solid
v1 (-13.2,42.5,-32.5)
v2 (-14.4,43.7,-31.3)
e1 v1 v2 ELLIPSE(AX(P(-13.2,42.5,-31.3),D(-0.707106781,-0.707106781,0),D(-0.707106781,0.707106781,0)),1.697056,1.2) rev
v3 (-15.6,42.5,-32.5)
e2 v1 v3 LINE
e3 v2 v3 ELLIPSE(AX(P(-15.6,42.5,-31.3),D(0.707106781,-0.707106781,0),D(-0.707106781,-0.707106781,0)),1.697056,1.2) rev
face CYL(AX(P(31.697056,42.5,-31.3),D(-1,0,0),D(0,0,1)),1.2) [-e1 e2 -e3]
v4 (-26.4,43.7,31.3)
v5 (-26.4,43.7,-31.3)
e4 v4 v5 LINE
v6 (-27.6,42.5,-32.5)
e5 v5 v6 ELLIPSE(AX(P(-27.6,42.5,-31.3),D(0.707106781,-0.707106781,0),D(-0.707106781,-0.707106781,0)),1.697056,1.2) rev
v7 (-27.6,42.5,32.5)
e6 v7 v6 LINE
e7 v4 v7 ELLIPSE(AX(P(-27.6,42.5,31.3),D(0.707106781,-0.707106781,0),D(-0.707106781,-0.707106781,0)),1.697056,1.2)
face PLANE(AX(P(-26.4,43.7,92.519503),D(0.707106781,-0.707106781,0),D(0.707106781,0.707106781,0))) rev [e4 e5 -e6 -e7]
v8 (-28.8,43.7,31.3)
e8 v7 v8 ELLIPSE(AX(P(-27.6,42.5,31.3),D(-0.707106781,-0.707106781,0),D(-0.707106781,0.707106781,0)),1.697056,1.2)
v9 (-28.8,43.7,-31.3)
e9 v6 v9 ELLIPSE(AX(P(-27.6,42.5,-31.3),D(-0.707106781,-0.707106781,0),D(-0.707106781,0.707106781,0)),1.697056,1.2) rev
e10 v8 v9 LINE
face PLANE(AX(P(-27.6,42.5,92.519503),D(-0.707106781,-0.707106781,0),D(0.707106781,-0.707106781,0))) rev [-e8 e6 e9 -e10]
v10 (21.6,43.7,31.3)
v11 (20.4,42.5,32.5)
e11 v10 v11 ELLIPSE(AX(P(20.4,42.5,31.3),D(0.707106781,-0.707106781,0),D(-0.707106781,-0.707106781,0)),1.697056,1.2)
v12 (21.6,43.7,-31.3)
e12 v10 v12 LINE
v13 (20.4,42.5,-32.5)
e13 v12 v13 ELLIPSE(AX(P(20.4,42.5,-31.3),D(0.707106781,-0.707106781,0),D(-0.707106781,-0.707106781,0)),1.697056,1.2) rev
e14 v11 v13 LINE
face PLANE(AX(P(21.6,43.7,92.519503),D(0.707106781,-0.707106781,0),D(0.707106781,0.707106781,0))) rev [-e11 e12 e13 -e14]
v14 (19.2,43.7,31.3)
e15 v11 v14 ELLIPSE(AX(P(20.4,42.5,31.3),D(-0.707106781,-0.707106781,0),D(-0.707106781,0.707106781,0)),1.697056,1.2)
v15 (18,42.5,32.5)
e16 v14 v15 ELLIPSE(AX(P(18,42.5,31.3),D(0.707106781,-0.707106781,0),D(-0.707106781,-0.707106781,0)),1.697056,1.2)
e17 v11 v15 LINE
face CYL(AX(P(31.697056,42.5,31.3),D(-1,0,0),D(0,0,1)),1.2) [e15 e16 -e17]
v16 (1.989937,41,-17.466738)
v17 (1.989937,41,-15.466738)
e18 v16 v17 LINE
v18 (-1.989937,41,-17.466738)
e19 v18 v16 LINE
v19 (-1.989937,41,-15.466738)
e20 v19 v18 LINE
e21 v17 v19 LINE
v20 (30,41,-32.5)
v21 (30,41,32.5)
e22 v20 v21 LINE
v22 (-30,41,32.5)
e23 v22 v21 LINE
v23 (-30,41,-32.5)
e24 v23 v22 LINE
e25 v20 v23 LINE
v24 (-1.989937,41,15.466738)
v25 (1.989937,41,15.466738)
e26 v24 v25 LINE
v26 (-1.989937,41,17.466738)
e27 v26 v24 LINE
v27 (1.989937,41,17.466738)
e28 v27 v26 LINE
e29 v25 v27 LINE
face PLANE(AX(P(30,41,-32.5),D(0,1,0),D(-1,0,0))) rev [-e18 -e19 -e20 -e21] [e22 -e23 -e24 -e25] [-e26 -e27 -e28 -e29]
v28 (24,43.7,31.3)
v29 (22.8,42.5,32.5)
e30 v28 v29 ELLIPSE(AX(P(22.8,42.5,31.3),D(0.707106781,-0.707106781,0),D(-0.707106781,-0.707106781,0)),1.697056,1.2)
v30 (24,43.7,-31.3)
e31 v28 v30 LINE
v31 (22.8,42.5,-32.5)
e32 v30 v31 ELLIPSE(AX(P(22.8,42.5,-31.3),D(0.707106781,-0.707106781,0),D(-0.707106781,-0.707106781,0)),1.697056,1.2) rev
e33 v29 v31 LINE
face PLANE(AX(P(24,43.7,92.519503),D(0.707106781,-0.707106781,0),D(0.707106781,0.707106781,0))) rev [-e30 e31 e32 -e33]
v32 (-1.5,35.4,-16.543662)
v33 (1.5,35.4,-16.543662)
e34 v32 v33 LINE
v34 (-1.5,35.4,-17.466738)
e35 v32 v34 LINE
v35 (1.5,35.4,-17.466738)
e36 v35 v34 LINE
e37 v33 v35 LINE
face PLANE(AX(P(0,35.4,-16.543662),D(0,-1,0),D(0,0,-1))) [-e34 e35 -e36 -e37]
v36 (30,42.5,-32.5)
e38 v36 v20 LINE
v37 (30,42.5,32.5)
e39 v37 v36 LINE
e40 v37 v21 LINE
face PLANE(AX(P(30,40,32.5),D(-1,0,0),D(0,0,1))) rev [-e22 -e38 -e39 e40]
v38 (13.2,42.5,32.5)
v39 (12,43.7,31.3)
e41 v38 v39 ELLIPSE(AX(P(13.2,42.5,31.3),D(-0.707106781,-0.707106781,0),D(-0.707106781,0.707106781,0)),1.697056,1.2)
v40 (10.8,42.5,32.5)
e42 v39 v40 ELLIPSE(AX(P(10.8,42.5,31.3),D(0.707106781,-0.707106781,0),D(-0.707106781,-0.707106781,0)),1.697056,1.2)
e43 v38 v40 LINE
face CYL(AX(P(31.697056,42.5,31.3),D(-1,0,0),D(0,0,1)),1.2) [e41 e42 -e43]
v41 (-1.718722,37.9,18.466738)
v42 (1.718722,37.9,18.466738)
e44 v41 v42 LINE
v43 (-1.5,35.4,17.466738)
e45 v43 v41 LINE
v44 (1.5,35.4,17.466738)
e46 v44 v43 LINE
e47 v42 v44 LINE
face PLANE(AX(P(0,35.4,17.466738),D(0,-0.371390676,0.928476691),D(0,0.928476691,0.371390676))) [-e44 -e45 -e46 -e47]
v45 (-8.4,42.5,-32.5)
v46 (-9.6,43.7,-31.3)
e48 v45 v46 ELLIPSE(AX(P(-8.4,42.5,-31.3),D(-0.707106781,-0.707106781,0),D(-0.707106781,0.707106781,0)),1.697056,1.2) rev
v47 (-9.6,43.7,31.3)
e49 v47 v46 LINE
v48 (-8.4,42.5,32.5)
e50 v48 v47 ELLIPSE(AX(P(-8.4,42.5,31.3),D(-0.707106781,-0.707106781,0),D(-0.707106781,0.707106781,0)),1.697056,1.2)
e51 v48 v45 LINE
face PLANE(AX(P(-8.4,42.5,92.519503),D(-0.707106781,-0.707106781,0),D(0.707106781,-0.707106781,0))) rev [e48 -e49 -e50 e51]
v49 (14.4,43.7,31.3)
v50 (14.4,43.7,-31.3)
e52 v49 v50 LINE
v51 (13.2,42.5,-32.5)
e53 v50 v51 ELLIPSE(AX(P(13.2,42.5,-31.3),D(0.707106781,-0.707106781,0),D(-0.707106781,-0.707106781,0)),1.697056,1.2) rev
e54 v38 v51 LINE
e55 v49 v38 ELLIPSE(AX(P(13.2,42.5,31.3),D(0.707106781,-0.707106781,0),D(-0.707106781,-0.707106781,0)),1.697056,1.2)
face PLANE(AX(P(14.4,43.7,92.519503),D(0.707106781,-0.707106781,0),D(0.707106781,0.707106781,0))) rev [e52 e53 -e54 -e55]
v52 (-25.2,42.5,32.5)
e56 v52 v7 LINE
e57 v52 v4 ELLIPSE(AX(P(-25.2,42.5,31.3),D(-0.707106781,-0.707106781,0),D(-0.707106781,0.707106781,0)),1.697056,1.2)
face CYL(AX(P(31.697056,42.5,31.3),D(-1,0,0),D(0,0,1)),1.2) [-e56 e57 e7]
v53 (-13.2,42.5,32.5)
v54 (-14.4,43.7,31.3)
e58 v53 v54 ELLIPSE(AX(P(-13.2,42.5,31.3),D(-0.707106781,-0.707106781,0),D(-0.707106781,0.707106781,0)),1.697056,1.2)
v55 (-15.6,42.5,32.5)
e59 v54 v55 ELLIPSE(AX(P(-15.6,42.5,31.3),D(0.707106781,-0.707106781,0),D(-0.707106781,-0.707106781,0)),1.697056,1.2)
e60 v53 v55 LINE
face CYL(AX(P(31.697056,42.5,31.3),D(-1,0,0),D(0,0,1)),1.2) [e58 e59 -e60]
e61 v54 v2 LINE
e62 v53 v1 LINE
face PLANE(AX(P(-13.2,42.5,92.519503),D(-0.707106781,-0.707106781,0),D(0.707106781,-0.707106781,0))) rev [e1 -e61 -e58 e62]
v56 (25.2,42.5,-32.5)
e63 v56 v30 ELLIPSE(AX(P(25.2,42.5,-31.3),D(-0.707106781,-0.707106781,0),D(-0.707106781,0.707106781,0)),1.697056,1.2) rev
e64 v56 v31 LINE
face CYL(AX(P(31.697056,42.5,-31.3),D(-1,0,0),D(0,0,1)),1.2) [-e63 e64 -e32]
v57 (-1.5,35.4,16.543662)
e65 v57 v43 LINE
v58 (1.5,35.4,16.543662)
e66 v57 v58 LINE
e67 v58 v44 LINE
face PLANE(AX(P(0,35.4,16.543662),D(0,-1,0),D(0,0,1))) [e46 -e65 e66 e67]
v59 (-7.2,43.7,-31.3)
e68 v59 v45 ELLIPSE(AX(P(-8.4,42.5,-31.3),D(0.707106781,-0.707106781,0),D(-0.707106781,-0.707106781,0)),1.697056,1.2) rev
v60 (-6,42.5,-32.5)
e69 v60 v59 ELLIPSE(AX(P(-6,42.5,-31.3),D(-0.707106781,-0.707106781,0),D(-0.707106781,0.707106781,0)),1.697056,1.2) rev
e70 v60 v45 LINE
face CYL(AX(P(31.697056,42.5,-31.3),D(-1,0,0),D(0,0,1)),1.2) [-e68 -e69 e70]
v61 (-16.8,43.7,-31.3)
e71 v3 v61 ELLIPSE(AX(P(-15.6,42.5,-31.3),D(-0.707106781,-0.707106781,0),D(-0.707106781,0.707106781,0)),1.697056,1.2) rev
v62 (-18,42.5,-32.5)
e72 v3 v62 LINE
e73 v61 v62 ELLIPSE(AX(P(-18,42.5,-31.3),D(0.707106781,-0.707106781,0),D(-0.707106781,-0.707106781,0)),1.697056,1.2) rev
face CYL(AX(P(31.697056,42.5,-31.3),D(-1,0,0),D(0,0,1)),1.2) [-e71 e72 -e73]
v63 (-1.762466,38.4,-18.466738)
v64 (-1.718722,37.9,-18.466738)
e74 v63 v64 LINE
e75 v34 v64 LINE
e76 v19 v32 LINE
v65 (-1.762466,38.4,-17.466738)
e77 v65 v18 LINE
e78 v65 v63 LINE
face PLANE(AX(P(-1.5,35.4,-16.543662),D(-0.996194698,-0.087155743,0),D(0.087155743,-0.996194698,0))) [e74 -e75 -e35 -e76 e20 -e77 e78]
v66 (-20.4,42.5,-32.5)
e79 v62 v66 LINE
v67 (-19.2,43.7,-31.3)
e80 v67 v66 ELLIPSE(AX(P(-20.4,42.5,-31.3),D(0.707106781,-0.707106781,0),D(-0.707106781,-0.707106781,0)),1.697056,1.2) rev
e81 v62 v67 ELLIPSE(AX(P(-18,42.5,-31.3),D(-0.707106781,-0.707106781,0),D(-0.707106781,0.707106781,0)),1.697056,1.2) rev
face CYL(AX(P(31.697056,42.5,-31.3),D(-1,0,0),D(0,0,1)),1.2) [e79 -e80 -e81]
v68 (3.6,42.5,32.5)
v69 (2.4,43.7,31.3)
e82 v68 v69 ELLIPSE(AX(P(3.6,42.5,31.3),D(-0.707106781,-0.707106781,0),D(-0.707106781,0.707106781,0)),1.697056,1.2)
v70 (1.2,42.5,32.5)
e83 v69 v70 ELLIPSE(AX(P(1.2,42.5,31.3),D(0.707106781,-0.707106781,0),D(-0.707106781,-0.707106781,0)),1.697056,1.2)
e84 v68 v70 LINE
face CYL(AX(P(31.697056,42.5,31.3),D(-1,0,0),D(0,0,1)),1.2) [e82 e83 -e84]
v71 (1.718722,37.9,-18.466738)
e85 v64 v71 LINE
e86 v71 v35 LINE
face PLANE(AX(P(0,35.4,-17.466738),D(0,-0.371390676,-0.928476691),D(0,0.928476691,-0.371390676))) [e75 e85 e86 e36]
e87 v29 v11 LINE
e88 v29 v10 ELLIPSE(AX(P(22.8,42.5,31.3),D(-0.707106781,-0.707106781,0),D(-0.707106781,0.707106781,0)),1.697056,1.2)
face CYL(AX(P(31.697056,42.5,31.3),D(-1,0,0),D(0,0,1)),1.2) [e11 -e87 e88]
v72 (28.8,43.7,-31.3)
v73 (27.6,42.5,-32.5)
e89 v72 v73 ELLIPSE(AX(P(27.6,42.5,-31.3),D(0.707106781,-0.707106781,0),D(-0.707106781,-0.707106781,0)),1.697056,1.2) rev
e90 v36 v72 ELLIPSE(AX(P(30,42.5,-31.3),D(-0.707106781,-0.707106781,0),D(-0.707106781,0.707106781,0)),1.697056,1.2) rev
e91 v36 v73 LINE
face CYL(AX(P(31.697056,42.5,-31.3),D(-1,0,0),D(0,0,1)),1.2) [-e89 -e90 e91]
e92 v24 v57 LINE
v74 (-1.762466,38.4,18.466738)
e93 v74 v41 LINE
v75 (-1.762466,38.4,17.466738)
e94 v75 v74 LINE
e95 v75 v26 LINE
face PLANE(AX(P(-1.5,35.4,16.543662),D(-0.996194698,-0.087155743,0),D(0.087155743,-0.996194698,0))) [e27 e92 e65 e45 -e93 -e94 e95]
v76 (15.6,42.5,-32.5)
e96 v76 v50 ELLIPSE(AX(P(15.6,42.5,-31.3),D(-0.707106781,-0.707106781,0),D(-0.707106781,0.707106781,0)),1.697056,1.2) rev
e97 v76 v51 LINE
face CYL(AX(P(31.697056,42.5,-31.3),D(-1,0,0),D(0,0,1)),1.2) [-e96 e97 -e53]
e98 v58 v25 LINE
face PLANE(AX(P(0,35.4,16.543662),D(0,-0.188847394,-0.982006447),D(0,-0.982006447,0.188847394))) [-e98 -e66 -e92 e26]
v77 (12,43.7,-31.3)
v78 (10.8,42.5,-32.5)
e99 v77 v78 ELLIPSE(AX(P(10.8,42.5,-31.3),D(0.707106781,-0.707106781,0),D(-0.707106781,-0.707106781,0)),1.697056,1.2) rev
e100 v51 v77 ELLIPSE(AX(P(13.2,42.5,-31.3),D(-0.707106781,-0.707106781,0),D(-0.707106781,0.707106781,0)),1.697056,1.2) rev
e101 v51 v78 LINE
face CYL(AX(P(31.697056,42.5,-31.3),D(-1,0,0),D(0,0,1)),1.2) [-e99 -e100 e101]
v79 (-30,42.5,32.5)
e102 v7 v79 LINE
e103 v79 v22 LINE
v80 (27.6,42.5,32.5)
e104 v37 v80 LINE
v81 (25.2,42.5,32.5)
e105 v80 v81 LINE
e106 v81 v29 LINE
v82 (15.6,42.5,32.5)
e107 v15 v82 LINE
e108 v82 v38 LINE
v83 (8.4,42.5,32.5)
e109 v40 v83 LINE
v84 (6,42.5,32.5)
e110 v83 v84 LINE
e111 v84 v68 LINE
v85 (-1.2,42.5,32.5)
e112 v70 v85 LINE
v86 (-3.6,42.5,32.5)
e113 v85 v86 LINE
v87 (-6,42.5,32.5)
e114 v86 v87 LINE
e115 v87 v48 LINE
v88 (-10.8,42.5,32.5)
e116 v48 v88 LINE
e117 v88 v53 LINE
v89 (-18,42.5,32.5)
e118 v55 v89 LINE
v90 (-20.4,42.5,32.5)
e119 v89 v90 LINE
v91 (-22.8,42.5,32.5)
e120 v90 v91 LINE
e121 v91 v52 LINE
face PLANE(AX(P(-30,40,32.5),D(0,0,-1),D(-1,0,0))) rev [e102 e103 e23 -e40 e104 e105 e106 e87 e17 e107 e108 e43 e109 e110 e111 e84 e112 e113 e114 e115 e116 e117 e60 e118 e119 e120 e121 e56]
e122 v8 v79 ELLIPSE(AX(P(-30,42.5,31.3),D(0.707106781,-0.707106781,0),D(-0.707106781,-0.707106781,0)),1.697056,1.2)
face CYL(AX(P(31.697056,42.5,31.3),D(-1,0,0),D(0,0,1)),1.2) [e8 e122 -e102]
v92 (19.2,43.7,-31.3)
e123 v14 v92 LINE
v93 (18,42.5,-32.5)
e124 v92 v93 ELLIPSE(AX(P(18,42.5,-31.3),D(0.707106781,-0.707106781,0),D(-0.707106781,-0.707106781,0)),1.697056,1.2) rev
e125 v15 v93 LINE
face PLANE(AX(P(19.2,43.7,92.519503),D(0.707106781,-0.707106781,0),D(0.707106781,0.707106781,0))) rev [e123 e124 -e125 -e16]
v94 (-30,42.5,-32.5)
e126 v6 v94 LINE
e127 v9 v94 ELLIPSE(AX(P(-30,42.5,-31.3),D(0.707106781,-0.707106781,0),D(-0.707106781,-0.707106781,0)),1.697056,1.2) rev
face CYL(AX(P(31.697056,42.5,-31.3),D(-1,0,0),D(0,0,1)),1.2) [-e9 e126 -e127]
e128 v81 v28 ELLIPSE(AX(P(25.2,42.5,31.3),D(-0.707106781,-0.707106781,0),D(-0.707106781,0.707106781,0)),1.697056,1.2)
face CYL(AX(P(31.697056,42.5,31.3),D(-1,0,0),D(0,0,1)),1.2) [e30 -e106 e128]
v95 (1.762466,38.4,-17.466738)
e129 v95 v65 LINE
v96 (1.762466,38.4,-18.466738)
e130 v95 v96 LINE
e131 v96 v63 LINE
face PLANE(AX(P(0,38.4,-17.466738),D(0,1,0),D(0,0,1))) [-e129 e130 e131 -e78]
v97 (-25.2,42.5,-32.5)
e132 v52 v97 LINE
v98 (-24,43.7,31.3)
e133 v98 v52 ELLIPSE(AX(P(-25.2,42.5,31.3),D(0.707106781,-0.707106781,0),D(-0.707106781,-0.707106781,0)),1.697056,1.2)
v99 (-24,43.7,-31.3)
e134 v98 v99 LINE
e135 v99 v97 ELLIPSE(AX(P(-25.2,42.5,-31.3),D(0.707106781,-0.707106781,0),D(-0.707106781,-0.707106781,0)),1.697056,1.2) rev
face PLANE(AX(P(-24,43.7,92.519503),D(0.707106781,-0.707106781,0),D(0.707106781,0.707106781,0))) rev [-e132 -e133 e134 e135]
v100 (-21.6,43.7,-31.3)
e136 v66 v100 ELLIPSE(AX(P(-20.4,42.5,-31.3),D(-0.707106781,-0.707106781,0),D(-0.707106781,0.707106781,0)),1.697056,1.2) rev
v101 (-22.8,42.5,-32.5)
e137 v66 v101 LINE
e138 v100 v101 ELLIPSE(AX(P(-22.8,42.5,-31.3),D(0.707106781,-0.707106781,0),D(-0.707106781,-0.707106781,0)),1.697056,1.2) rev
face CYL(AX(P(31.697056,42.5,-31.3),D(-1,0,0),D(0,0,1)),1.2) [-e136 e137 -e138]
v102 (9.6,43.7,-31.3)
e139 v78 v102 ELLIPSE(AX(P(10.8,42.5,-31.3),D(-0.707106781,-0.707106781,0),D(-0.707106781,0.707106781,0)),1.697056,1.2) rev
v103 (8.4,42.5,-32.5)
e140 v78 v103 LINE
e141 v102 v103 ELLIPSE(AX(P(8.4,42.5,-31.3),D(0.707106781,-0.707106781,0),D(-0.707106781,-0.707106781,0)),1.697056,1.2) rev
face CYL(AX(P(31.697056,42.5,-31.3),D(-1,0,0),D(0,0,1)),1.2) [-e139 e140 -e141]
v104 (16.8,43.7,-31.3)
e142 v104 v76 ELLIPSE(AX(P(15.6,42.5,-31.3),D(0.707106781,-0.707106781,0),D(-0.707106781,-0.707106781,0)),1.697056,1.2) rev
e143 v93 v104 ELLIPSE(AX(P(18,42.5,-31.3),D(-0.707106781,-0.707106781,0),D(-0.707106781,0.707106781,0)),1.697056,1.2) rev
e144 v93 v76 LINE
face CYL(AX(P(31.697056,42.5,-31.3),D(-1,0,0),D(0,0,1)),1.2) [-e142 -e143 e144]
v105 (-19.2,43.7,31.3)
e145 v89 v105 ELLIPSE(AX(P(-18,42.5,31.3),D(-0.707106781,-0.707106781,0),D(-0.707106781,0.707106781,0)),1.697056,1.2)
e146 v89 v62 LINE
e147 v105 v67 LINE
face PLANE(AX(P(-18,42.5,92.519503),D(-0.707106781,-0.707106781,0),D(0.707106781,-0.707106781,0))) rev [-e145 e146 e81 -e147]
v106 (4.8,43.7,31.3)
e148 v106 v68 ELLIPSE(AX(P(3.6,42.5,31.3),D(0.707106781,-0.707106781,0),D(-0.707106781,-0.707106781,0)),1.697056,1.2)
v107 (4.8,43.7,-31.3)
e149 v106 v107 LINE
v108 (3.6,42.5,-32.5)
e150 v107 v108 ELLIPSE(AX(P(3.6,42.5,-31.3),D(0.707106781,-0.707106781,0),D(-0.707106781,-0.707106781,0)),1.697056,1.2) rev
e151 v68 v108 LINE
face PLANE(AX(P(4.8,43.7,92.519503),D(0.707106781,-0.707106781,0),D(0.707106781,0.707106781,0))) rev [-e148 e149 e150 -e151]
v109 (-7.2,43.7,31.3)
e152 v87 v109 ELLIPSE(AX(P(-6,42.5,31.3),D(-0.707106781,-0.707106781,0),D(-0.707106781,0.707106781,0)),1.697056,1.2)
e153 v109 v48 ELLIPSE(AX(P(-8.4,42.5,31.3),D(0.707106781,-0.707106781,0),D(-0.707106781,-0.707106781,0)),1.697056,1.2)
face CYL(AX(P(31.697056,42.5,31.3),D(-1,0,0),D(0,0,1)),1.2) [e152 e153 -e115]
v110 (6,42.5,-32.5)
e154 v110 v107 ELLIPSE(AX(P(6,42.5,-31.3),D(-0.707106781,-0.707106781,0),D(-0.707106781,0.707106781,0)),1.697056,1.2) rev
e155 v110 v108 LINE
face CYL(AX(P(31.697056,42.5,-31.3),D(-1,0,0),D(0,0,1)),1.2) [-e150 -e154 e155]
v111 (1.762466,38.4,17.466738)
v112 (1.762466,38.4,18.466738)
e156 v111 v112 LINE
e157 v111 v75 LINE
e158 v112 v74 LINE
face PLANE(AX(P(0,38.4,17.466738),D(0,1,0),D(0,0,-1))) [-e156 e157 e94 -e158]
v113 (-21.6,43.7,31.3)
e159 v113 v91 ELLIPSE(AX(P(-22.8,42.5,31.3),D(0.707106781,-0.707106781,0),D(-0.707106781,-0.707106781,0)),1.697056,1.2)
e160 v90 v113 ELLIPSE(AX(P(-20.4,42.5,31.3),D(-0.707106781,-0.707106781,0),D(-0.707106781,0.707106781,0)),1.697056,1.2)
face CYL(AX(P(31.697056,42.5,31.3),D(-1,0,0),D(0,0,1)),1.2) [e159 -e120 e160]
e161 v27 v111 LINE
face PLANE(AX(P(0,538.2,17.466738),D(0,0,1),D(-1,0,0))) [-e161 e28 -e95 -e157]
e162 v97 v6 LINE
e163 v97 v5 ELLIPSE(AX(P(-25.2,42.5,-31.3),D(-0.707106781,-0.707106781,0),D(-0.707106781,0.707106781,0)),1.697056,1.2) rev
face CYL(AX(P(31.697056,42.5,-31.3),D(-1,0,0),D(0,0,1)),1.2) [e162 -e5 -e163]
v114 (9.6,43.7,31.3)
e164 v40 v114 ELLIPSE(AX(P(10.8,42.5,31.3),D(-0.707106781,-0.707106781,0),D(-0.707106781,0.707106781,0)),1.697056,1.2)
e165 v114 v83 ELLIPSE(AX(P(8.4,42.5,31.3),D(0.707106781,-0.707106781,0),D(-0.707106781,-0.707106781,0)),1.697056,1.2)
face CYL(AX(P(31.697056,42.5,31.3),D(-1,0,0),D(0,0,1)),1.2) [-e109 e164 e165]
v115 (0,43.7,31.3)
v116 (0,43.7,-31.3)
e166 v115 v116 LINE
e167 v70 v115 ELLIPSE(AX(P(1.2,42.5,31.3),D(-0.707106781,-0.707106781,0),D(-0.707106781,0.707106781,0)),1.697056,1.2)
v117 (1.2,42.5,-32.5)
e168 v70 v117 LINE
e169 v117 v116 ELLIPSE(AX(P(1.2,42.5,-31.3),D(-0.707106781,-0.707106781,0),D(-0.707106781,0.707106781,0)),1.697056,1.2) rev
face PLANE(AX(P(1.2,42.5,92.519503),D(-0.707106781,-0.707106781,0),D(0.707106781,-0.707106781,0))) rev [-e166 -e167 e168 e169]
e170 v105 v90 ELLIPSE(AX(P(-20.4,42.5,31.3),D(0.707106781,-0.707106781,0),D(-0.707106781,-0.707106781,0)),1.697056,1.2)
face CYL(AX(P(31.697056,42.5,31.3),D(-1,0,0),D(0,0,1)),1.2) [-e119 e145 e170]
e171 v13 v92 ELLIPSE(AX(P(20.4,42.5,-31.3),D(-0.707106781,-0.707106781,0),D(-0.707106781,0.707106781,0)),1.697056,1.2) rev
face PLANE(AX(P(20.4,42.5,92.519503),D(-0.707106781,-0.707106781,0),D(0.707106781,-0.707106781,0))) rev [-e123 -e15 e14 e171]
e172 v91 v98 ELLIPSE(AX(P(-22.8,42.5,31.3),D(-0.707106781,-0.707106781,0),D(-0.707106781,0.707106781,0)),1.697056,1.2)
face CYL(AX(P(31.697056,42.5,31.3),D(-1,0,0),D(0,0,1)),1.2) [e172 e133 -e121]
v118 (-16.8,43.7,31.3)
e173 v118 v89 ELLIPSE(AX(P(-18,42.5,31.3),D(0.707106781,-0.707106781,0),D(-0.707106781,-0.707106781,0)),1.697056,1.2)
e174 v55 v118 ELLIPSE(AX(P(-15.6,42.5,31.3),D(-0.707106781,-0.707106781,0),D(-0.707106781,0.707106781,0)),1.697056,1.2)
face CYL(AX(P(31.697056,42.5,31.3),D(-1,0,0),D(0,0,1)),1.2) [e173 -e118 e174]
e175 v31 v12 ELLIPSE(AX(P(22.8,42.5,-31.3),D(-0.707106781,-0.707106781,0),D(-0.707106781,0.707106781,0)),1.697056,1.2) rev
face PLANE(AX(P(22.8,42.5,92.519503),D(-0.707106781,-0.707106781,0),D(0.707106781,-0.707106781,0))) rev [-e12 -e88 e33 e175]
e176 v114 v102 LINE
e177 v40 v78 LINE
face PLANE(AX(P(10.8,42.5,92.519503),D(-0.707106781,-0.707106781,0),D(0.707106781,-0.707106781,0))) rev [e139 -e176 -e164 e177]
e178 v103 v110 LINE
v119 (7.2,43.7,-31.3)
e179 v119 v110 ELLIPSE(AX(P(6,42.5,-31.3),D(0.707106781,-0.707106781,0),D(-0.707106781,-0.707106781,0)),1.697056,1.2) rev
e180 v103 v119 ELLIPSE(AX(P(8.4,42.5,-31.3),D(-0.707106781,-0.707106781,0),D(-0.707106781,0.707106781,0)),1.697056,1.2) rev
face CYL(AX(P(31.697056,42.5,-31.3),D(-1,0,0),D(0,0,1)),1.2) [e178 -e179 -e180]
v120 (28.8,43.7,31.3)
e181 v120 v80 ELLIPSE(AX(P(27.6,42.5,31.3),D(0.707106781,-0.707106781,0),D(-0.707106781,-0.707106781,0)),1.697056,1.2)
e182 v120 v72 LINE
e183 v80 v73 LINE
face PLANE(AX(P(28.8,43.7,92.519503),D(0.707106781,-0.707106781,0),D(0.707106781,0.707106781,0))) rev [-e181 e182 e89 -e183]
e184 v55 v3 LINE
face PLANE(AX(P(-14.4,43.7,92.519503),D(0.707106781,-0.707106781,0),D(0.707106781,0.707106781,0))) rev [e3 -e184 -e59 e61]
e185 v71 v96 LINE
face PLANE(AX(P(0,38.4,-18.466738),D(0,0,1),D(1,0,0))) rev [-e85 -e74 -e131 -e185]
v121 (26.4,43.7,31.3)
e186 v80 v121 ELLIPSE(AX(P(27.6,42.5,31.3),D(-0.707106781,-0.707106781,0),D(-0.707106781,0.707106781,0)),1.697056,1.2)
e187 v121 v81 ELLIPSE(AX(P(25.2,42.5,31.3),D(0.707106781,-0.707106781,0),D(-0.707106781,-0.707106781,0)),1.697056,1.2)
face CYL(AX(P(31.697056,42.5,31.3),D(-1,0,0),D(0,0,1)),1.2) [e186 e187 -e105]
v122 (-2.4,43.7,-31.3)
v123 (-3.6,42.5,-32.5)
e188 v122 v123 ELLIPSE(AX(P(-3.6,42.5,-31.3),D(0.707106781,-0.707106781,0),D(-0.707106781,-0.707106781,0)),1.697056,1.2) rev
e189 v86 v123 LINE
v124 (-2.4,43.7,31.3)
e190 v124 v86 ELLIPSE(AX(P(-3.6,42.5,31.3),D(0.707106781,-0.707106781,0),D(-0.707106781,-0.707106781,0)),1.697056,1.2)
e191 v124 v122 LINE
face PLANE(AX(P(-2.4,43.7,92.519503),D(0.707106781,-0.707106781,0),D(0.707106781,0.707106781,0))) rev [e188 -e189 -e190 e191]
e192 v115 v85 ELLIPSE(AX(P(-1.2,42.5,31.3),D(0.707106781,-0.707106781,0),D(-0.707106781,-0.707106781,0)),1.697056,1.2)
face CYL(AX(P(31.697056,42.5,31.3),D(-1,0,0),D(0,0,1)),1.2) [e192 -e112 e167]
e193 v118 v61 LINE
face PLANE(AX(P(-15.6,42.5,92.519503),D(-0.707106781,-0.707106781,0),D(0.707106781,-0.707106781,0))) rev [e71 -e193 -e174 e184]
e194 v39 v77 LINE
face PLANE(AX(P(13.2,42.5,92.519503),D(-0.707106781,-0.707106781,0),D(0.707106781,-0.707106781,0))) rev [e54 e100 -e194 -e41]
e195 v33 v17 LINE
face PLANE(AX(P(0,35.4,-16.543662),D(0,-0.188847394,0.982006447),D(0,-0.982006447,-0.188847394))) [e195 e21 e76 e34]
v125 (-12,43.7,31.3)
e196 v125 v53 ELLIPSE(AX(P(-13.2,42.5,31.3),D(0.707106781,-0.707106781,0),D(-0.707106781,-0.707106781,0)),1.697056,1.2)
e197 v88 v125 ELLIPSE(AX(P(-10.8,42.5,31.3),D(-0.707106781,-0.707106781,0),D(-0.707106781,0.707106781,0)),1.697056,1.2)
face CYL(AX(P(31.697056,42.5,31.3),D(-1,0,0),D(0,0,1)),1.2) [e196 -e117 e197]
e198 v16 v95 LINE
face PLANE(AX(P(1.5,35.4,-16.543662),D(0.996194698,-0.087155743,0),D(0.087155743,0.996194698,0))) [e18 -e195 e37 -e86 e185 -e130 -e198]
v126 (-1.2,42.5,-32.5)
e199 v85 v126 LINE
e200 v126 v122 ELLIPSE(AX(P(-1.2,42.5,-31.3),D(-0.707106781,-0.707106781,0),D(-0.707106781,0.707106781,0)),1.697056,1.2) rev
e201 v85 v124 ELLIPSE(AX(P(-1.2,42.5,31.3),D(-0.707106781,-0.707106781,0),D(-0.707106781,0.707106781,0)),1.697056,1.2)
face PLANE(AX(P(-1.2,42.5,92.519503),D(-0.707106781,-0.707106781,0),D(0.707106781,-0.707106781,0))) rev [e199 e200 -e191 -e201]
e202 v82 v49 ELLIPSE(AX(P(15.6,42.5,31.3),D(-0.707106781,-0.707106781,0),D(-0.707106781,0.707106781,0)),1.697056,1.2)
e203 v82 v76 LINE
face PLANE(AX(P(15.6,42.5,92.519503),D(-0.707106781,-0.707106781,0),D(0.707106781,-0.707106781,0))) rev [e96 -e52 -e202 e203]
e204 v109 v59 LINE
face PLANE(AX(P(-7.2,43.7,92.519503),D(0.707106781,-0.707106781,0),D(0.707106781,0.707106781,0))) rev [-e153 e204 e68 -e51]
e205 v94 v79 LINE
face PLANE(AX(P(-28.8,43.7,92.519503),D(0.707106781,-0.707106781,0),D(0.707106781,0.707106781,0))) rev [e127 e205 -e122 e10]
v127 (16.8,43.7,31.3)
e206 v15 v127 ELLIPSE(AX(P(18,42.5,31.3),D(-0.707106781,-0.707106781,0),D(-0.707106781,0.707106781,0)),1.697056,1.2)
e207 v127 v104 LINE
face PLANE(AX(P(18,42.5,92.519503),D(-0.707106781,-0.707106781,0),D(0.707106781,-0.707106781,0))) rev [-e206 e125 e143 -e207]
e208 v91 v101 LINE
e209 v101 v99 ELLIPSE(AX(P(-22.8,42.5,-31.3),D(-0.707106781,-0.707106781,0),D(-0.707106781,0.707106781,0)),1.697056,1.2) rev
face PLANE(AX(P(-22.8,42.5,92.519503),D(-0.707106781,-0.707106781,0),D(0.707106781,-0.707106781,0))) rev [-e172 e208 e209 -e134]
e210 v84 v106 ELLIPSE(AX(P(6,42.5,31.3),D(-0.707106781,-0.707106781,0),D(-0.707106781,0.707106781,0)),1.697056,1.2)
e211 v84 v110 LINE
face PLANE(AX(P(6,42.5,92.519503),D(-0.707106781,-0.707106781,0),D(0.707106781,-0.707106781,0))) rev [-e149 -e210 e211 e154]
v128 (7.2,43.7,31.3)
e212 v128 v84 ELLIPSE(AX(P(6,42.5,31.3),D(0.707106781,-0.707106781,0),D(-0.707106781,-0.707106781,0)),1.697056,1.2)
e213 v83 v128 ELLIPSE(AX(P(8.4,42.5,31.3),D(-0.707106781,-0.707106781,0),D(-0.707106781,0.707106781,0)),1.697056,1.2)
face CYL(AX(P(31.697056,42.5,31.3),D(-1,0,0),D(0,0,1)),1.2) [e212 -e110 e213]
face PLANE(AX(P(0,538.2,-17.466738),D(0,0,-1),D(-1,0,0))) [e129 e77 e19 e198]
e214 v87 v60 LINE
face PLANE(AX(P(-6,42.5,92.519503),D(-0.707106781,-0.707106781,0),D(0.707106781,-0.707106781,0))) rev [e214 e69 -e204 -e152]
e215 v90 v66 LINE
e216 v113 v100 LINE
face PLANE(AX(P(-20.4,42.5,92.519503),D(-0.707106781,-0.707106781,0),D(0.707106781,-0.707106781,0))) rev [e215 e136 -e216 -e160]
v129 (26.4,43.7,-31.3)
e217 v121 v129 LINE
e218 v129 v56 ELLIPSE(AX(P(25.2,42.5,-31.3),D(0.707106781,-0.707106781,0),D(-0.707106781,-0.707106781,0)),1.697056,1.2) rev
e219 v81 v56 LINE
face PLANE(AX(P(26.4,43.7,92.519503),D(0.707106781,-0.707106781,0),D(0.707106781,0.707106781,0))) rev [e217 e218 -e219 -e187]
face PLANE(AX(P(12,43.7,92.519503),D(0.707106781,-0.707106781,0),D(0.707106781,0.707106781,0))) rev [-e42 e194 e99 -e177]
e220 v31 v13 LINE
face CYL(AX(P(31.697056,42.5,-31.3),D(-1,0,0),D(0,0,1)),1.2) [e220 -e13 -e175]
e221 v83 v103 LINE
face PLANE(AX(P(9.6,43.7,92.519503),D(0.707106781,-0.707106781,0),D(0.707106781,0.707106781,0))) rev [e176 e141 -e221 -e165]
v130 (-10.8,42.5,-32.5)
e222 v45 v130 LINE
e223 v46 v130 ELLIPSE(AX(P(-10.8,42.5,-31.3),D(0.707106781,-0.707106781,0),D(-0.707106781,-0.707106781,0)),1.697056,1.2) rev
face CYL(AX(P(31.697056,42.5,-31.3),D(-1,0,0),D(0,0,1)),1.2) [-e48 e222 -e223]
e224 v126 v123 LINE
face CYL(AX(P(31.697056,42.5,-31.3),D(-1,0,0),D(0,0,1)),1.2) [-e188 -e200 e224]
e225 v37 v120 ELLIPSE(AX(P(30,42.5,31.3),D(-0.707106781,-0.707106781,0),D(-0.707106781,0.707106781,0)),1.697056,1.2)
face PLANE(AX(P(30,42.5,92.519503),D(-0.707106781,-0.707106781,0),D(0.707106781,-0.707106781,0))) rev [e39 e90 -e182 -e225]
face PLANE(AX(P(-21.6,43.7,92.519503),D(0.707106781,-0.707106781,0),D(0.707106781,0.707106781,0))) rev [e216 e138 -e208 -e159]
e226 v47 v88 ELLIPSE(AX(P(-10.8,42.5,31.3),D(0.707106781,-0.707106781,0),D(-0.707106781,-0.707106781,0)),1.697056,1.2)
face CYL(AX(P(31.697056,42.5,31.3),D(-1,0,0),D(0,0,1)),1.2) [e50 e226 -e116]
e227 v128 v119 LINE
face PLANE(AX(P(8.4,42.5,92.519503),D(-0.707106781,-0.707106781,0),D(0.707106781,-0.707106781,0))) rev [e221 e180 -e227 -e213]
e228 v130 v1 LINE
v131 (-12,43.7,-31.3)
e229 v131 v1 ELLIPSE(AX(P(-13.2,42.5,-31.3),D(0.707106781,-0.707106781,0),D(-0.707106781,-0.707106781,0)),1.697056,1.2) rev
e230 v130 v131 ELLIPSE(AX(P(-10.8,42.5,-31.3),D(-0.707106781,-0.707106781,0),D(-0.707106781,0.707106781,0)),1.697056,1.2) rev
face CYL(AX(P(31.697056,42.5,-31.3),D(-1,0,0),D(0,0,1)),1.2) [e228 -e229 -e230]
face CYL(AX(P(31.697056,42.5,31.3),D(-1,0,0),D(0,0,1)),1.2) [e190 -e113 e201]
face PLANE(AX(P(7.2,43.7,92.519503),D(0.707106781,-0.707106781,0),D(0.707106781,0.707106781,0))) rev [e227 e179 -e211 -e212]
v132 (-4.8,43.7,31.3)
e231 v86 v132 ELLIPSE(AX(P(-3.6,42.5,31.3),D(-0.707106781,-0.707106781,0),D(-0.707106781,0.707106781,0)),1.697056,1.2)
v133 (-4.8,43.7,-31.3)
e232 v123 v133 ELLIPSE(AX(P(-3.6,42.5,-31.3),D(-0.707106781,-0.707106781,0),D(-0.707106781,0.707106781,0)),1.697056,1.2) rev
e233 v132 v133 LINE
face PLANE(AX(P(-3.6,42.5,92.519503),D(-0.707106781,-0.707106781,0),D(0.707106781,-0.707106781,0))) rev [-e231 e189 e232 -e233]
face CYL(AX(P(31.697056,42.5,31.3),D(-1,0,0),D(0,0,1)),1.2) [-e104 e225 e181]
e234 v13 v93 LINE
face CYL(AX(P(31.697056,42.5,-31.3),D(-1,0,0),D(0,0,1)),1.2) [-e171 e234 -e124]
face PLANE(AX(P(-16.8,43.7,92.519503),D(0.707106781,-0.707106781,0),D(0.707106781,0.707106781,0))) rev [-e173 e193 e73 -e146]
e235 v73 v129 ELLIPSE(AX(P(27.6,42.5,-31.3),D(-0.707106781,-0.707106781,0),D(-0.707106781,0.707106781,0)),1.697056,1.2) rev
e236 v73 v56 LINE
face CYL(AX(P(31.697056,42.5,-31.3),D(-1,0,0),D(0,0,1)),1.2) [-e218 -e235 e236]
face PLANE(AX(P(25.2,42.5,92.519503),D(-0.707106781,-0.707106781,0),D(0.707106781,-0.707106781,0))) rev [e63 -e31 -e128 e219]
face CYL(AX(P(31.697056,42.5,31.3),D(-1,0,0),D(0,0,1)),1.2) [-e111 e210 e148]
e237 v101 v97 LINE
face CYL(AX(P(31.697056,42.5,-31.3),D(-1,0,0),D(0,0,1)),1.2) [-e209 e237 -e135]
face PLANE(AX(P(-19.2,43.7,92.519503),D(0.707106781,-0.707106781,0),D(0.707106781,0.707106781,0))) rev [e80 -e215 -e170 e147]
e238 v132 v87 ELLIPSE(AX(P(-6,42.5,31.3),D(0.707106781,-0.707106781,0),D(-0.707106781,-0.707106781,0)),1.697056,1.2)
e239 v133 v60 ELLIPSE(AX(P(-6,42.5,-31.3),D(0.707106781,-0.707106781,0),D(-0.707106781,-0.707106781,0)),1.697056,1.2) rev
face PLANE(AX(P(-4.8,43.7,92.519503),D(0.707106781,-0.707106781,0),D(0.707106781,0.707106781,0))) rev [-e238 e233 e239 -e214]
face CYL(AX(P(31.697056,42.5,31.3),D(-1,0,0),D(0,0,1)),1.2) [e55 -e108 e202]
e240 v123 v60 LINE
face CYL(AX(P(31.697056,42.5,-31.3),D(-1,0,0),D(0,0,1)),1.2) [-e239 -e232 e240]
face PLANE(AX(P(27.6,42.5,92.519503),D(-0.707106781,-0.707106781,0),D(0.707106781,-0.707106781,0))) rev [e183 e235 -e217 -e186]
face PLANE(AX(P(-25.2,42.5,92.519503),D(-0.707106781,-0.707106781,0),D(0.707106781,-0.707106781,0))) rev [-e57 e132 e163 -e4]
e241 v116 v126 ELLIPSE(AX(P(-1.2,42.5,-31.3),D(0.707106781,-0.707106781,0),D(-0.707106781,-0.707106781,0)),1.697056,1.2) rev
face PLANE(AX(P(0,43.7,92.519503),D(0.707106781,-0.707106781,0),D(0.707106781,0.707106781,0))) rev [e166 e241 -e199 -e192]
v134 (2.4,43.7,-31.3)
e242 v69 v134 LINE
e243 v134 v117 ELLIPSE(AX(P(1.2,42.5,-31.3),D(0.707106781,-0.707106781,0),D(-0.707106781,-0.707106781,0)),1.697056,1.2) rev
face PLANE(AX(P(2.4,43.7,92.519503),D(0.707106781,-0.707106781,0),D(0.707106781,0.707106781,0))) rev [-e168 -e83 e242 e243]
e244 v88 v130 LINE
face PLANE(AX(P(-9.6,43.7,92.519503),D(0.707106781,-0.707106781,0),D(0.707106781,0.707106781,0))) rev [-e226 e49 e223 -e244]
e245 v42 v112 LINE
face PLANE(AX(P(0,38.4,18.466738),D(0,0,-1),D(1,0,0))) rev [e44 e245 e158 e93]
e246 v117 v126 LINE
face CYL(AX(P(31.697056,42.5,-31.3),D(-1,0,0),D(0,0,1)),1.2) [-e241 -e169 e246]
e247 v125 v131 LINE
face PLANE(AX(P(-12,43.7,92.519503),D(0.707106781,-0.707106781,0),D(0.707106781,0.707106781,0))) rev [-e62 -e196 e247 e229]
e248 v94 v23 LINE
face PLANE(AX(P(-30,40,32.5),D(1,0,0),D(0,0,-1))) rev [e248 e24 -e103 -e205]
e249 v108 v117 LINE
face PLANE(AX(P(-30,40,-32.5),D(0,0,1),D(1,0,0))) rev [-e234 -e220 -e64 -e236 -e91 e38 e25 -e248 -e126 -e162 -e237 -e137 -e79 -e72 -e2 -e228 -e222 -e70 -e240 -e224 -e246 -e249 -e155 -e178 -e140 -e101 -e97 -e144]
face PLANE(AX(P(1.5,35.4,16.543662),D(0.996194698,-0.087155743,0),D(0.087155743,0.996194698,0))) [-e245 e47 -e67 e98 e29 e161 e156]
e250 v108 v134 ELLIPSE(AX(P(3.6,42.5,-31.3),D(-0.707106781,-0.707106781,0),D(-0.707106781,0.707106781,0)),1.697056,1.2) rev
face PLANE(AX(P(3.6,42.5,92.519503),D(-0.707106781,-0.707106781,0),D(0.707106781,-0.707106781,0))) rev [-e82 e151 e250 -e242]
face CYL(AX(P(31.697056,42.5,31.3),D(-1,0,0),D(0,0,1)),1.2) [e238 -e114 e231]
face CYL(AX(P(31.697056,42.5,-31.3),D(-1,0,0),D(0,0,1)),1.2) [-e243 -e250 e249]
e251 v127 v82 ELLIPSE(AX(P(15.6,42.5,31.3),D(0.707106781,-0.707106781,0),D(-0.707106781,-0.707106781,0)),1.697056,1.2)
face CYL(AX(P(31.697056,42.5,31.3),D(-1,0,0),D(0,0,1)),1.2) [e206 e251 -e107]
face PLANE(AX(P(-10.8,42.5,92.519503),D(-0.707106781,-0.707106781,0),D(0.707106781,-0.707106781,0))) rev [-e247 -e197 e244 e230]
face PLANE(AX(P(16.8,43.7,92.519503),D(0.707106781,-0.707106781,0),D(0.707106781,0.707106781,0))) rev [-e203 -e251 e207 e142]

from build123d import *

# Parameters (mm, degrees)
SKETCH1_W               = 60
SKETCH1_H               = 65
SKETCH1_W_2             = 55
SKETCH1_H_2             = 60
BOSS_EXTRUDE1_DEPTH     = 40
SKETCH2_W               = 60
SKETCH2_H               = 65
BOSS_EXTRUDE2_DEPTH     = 2.5
BOSS_EXTRUDE3_DEPTH     = 65
CUT_EXTRUDE1_REACH      = 83.03
CUT_EXTRUDE2_DEPTH      = 84.873058845
CUT_EXTRUDE2_DEPTH_BACK = 84.873058845
SKETCH5_W               = 60
SKETCH5_H               = 41
SNAP_START              = -17.466738465
SNAP_HOOK1_DEPTH        = 0.923076923
SNAP_START_2            = -1.762465991
SNAP_HOOK1_2_DEPTH      = 3.524931982
SNAP_START_3            = -1.989936516
SNAP_HOOK1_3_DEPTH      = 3.979873032
SNAP_START_4            = -19
SNAP_HOOK1_4_DEPTH      = 5


with BuildPart() as part:
    # Sketch1 → Boss-Extrude1 (new body)
    with BuildSketch(Plane(origin=(0, 0, 0), x_dir=(1, 0, 0), z_dir=(0, 1, 0))):
        Rectangle(SKETCH1_W, SKETCH1_H)
        Rectangle(SKETCH1_W_2, SKETCH1_H_2, mode=Mode.SUBTRACT)
    extrude(amount=BOSS_EXTRUDE1_DEPTH)

    # Sketch2 → Boss-Extrude2 (add)
    with BuildSketch(Plane(origin=(0, 40, 0), x_dir=(1, 0, 0), z_dir=(0, 1, 0))):
        Rectangle(SKETCH2_W, SKETCH2_H)
    extrude(amount=BOSS_EXTRUDE2_DEPTH)

    # Sketch3 → Boss-Extrude3 (add)
    with BuildSketch(Plane(origin=(0, 0, -32.5), x_dir=(-1, 0, 0), z_dir=(0, 0, -1))):
        Polygon((-30, 42.5), (-28.8, 43.7), (-27.6, 42.5), (-26.4, 43.7), (-25.2, 42.5), (-24, 43.7), (-22.8, 42.5), (-21.6, 43.7), (-20.4, 42.5), (-19.2, 43.7), (-18, 42.5), (-16.8, 43.7), (-15.6, 42.5), (-14.4, 43.7), (-13.2, 42.5), (-12, 43.7), (-10.8, 42.5), (-9.6, 43.7), (-8.4, 42.5), (-7.2, 43.7), (-6, 42.5), (-4.8, 43.7), (-3.6, 42.5), (-2.4, 43.7), (-1.2, 42.5), (0, 43.7), (1.2, 42.5), (2.4, 43.7), (3.6, 42.5), (4.8, 43.7), (6, 42.5), (7.2, 43.7), (8.4, 42.5), (9.6, 43.7), (10.8, 42.5), (12, 43.7), (13.2, 42.5), (14.4, 43.7), (15.6, 42.5), (16.8, 43.7), (18, 42.5), (19.2, 43.7), (20.4, 42.5), (21.6, 43.7), (22.8, 42.5), (24, 43.7), (25.2, 42.5), (26.4, 43.7), (27.6, 42.5), (28.8, 43.7), (30, 42.5), (30, 42.170064374), (-30, 42.170064374), align=None)
    extrude(amount=-BOSS_EXTRUDE3_DEPTH)

    # Cut-Extrude1: up to this face of the body (flat: up to its plane)
    cut_extrude1_end = Plane(part.part.faces().sort_by_distance((30, 21.25, 0))[0])
    # Sketch4 → Cut-Extrude1 (cut, up to the picked face)
    with BuildSketch(Plane.ZY.offset(30), mode=Mode.PRIVATE) as cut_extrude1_sk1:
        with BuildLine():
            Line((-32.5, 42.5), (-32.5, 43.7))
            Line((-32.5, 43.7), (-31.3, 43.7))
            ThreePointArc((-31.3, 43.7), (-32.148528137, 43.348528137), (-32.5, 42.5))
        make_face()
    cut_extrude1_tool1 = split(extrude(cut_extrude1_sk1.sketch, amount=-CUT_EXTRUDE1_REACH, mode=Mode.PRIVATE), bisect_by=cut_extrude1_end, keep=Keep.BOTH, mode=Mode.PRIVATE)
    cut_extrude1 = cut_extrude1_tool1.solids().sort_by(Axis((-30, 43.431958, -32.231958), (1, 0, 0)))[0]
    add(cut_extrude1, mode=Mode.SUBTRACT)

    # Mirror1: Cut-Extrude1 across plane
    add(cut_extrude1.mirror(Plane.XY), mode=Mode.SUBTRACT)

    # Sketch5 → Cut-Extrude2 (cut, two sides: drawn at the far end of the back side and taken through both)
    with BuildSketch(Plane.XY.offset(32.5).offset(-CUT_EXTRUDE2_DEPTH_BACK)):
        with Locations((0, 20.5)):
            Rectangle(SKETCH5_W, SKETCH5_H)
    extrude(amount=CUT_EXTRUDE2_DEPTH + CUT_EXTRUDE2_DEPTH_BACK, mode=Mode.SUBTRACT)

    # Snap Hook1: read off the stored shape, not the designer's step
    # Snap Hook1 outline → Snap Hook1 (add)
    with BuildSketch(Plane.XY.offset(SNAP_START)):
        Polygon((-1.5, 35.4), (1.5, 35.4), (1.989936516, 41), (-1.989936516, 41), align=None)
    snap_hook1 = extrude(amount=SNAP_HOOK1_DEPTH)

    # Snap Hook1 2 outline → Snap Hook1 2 (add)
    with BuildSketch(Plane.YZ.offset(SNAP_START_2)):
        Polygon((38.4, -17.466738465), (35.4, -17.466738465), (37.9, -18.466738465), (38.4, -18.466738465), align=None)
        Polygon((35.4, -16.543661542), (41, -16.543661542), (41, -15.466738465), align=None)
    snap_hook1_2 = extrude(amount=SNAP_HOOK1_2_DEPTH)

    # Snap Hook1 3 outline → Snap Hook1 3 (add)
    with BuildSketch(Plane.YZ.offset(SNAP_START_3)):
        Polygon((35.4, -16.543661542), (41, -16.543661542), (41, -15.466738465), align=None)
    snap_hook1_3 = extrude(amount=SNAP_HOOK1_3_DEPTH)

    # Snap Hook1 4 outline → Snap Hook1 4 (cut)
    with BuildSketch(Plane.XY.offset(SNAP_START_4)):
        Polygon((-1.989936516, 41), (-1.989936516, 34), (-1.377515871, 34), align=None)
        Polygon((1.377515871, 34), (1.989936516, 34), (1.989936516, 41), align=None)
    snap_hook1_4 = extrude(amount=SNAP_HOOK1_4_DEPTH, mode=Mode.SUBTRACT)

    # Mirror2: Snap Hook1, Snap Hook1 2, Snap Hook1 3, Snap Hook1 4 across plane
    add(snap_hook1.mirror(Plane.XY))
    add(snap_hook1_2.mirror(Plane.XY))
    add(snap_hook1_3.mirror(Plane.XY))
    add(snap_hook1_4.mirror(Plane.XY), mode=Mode.SUBTRACT)


solid = part.part
